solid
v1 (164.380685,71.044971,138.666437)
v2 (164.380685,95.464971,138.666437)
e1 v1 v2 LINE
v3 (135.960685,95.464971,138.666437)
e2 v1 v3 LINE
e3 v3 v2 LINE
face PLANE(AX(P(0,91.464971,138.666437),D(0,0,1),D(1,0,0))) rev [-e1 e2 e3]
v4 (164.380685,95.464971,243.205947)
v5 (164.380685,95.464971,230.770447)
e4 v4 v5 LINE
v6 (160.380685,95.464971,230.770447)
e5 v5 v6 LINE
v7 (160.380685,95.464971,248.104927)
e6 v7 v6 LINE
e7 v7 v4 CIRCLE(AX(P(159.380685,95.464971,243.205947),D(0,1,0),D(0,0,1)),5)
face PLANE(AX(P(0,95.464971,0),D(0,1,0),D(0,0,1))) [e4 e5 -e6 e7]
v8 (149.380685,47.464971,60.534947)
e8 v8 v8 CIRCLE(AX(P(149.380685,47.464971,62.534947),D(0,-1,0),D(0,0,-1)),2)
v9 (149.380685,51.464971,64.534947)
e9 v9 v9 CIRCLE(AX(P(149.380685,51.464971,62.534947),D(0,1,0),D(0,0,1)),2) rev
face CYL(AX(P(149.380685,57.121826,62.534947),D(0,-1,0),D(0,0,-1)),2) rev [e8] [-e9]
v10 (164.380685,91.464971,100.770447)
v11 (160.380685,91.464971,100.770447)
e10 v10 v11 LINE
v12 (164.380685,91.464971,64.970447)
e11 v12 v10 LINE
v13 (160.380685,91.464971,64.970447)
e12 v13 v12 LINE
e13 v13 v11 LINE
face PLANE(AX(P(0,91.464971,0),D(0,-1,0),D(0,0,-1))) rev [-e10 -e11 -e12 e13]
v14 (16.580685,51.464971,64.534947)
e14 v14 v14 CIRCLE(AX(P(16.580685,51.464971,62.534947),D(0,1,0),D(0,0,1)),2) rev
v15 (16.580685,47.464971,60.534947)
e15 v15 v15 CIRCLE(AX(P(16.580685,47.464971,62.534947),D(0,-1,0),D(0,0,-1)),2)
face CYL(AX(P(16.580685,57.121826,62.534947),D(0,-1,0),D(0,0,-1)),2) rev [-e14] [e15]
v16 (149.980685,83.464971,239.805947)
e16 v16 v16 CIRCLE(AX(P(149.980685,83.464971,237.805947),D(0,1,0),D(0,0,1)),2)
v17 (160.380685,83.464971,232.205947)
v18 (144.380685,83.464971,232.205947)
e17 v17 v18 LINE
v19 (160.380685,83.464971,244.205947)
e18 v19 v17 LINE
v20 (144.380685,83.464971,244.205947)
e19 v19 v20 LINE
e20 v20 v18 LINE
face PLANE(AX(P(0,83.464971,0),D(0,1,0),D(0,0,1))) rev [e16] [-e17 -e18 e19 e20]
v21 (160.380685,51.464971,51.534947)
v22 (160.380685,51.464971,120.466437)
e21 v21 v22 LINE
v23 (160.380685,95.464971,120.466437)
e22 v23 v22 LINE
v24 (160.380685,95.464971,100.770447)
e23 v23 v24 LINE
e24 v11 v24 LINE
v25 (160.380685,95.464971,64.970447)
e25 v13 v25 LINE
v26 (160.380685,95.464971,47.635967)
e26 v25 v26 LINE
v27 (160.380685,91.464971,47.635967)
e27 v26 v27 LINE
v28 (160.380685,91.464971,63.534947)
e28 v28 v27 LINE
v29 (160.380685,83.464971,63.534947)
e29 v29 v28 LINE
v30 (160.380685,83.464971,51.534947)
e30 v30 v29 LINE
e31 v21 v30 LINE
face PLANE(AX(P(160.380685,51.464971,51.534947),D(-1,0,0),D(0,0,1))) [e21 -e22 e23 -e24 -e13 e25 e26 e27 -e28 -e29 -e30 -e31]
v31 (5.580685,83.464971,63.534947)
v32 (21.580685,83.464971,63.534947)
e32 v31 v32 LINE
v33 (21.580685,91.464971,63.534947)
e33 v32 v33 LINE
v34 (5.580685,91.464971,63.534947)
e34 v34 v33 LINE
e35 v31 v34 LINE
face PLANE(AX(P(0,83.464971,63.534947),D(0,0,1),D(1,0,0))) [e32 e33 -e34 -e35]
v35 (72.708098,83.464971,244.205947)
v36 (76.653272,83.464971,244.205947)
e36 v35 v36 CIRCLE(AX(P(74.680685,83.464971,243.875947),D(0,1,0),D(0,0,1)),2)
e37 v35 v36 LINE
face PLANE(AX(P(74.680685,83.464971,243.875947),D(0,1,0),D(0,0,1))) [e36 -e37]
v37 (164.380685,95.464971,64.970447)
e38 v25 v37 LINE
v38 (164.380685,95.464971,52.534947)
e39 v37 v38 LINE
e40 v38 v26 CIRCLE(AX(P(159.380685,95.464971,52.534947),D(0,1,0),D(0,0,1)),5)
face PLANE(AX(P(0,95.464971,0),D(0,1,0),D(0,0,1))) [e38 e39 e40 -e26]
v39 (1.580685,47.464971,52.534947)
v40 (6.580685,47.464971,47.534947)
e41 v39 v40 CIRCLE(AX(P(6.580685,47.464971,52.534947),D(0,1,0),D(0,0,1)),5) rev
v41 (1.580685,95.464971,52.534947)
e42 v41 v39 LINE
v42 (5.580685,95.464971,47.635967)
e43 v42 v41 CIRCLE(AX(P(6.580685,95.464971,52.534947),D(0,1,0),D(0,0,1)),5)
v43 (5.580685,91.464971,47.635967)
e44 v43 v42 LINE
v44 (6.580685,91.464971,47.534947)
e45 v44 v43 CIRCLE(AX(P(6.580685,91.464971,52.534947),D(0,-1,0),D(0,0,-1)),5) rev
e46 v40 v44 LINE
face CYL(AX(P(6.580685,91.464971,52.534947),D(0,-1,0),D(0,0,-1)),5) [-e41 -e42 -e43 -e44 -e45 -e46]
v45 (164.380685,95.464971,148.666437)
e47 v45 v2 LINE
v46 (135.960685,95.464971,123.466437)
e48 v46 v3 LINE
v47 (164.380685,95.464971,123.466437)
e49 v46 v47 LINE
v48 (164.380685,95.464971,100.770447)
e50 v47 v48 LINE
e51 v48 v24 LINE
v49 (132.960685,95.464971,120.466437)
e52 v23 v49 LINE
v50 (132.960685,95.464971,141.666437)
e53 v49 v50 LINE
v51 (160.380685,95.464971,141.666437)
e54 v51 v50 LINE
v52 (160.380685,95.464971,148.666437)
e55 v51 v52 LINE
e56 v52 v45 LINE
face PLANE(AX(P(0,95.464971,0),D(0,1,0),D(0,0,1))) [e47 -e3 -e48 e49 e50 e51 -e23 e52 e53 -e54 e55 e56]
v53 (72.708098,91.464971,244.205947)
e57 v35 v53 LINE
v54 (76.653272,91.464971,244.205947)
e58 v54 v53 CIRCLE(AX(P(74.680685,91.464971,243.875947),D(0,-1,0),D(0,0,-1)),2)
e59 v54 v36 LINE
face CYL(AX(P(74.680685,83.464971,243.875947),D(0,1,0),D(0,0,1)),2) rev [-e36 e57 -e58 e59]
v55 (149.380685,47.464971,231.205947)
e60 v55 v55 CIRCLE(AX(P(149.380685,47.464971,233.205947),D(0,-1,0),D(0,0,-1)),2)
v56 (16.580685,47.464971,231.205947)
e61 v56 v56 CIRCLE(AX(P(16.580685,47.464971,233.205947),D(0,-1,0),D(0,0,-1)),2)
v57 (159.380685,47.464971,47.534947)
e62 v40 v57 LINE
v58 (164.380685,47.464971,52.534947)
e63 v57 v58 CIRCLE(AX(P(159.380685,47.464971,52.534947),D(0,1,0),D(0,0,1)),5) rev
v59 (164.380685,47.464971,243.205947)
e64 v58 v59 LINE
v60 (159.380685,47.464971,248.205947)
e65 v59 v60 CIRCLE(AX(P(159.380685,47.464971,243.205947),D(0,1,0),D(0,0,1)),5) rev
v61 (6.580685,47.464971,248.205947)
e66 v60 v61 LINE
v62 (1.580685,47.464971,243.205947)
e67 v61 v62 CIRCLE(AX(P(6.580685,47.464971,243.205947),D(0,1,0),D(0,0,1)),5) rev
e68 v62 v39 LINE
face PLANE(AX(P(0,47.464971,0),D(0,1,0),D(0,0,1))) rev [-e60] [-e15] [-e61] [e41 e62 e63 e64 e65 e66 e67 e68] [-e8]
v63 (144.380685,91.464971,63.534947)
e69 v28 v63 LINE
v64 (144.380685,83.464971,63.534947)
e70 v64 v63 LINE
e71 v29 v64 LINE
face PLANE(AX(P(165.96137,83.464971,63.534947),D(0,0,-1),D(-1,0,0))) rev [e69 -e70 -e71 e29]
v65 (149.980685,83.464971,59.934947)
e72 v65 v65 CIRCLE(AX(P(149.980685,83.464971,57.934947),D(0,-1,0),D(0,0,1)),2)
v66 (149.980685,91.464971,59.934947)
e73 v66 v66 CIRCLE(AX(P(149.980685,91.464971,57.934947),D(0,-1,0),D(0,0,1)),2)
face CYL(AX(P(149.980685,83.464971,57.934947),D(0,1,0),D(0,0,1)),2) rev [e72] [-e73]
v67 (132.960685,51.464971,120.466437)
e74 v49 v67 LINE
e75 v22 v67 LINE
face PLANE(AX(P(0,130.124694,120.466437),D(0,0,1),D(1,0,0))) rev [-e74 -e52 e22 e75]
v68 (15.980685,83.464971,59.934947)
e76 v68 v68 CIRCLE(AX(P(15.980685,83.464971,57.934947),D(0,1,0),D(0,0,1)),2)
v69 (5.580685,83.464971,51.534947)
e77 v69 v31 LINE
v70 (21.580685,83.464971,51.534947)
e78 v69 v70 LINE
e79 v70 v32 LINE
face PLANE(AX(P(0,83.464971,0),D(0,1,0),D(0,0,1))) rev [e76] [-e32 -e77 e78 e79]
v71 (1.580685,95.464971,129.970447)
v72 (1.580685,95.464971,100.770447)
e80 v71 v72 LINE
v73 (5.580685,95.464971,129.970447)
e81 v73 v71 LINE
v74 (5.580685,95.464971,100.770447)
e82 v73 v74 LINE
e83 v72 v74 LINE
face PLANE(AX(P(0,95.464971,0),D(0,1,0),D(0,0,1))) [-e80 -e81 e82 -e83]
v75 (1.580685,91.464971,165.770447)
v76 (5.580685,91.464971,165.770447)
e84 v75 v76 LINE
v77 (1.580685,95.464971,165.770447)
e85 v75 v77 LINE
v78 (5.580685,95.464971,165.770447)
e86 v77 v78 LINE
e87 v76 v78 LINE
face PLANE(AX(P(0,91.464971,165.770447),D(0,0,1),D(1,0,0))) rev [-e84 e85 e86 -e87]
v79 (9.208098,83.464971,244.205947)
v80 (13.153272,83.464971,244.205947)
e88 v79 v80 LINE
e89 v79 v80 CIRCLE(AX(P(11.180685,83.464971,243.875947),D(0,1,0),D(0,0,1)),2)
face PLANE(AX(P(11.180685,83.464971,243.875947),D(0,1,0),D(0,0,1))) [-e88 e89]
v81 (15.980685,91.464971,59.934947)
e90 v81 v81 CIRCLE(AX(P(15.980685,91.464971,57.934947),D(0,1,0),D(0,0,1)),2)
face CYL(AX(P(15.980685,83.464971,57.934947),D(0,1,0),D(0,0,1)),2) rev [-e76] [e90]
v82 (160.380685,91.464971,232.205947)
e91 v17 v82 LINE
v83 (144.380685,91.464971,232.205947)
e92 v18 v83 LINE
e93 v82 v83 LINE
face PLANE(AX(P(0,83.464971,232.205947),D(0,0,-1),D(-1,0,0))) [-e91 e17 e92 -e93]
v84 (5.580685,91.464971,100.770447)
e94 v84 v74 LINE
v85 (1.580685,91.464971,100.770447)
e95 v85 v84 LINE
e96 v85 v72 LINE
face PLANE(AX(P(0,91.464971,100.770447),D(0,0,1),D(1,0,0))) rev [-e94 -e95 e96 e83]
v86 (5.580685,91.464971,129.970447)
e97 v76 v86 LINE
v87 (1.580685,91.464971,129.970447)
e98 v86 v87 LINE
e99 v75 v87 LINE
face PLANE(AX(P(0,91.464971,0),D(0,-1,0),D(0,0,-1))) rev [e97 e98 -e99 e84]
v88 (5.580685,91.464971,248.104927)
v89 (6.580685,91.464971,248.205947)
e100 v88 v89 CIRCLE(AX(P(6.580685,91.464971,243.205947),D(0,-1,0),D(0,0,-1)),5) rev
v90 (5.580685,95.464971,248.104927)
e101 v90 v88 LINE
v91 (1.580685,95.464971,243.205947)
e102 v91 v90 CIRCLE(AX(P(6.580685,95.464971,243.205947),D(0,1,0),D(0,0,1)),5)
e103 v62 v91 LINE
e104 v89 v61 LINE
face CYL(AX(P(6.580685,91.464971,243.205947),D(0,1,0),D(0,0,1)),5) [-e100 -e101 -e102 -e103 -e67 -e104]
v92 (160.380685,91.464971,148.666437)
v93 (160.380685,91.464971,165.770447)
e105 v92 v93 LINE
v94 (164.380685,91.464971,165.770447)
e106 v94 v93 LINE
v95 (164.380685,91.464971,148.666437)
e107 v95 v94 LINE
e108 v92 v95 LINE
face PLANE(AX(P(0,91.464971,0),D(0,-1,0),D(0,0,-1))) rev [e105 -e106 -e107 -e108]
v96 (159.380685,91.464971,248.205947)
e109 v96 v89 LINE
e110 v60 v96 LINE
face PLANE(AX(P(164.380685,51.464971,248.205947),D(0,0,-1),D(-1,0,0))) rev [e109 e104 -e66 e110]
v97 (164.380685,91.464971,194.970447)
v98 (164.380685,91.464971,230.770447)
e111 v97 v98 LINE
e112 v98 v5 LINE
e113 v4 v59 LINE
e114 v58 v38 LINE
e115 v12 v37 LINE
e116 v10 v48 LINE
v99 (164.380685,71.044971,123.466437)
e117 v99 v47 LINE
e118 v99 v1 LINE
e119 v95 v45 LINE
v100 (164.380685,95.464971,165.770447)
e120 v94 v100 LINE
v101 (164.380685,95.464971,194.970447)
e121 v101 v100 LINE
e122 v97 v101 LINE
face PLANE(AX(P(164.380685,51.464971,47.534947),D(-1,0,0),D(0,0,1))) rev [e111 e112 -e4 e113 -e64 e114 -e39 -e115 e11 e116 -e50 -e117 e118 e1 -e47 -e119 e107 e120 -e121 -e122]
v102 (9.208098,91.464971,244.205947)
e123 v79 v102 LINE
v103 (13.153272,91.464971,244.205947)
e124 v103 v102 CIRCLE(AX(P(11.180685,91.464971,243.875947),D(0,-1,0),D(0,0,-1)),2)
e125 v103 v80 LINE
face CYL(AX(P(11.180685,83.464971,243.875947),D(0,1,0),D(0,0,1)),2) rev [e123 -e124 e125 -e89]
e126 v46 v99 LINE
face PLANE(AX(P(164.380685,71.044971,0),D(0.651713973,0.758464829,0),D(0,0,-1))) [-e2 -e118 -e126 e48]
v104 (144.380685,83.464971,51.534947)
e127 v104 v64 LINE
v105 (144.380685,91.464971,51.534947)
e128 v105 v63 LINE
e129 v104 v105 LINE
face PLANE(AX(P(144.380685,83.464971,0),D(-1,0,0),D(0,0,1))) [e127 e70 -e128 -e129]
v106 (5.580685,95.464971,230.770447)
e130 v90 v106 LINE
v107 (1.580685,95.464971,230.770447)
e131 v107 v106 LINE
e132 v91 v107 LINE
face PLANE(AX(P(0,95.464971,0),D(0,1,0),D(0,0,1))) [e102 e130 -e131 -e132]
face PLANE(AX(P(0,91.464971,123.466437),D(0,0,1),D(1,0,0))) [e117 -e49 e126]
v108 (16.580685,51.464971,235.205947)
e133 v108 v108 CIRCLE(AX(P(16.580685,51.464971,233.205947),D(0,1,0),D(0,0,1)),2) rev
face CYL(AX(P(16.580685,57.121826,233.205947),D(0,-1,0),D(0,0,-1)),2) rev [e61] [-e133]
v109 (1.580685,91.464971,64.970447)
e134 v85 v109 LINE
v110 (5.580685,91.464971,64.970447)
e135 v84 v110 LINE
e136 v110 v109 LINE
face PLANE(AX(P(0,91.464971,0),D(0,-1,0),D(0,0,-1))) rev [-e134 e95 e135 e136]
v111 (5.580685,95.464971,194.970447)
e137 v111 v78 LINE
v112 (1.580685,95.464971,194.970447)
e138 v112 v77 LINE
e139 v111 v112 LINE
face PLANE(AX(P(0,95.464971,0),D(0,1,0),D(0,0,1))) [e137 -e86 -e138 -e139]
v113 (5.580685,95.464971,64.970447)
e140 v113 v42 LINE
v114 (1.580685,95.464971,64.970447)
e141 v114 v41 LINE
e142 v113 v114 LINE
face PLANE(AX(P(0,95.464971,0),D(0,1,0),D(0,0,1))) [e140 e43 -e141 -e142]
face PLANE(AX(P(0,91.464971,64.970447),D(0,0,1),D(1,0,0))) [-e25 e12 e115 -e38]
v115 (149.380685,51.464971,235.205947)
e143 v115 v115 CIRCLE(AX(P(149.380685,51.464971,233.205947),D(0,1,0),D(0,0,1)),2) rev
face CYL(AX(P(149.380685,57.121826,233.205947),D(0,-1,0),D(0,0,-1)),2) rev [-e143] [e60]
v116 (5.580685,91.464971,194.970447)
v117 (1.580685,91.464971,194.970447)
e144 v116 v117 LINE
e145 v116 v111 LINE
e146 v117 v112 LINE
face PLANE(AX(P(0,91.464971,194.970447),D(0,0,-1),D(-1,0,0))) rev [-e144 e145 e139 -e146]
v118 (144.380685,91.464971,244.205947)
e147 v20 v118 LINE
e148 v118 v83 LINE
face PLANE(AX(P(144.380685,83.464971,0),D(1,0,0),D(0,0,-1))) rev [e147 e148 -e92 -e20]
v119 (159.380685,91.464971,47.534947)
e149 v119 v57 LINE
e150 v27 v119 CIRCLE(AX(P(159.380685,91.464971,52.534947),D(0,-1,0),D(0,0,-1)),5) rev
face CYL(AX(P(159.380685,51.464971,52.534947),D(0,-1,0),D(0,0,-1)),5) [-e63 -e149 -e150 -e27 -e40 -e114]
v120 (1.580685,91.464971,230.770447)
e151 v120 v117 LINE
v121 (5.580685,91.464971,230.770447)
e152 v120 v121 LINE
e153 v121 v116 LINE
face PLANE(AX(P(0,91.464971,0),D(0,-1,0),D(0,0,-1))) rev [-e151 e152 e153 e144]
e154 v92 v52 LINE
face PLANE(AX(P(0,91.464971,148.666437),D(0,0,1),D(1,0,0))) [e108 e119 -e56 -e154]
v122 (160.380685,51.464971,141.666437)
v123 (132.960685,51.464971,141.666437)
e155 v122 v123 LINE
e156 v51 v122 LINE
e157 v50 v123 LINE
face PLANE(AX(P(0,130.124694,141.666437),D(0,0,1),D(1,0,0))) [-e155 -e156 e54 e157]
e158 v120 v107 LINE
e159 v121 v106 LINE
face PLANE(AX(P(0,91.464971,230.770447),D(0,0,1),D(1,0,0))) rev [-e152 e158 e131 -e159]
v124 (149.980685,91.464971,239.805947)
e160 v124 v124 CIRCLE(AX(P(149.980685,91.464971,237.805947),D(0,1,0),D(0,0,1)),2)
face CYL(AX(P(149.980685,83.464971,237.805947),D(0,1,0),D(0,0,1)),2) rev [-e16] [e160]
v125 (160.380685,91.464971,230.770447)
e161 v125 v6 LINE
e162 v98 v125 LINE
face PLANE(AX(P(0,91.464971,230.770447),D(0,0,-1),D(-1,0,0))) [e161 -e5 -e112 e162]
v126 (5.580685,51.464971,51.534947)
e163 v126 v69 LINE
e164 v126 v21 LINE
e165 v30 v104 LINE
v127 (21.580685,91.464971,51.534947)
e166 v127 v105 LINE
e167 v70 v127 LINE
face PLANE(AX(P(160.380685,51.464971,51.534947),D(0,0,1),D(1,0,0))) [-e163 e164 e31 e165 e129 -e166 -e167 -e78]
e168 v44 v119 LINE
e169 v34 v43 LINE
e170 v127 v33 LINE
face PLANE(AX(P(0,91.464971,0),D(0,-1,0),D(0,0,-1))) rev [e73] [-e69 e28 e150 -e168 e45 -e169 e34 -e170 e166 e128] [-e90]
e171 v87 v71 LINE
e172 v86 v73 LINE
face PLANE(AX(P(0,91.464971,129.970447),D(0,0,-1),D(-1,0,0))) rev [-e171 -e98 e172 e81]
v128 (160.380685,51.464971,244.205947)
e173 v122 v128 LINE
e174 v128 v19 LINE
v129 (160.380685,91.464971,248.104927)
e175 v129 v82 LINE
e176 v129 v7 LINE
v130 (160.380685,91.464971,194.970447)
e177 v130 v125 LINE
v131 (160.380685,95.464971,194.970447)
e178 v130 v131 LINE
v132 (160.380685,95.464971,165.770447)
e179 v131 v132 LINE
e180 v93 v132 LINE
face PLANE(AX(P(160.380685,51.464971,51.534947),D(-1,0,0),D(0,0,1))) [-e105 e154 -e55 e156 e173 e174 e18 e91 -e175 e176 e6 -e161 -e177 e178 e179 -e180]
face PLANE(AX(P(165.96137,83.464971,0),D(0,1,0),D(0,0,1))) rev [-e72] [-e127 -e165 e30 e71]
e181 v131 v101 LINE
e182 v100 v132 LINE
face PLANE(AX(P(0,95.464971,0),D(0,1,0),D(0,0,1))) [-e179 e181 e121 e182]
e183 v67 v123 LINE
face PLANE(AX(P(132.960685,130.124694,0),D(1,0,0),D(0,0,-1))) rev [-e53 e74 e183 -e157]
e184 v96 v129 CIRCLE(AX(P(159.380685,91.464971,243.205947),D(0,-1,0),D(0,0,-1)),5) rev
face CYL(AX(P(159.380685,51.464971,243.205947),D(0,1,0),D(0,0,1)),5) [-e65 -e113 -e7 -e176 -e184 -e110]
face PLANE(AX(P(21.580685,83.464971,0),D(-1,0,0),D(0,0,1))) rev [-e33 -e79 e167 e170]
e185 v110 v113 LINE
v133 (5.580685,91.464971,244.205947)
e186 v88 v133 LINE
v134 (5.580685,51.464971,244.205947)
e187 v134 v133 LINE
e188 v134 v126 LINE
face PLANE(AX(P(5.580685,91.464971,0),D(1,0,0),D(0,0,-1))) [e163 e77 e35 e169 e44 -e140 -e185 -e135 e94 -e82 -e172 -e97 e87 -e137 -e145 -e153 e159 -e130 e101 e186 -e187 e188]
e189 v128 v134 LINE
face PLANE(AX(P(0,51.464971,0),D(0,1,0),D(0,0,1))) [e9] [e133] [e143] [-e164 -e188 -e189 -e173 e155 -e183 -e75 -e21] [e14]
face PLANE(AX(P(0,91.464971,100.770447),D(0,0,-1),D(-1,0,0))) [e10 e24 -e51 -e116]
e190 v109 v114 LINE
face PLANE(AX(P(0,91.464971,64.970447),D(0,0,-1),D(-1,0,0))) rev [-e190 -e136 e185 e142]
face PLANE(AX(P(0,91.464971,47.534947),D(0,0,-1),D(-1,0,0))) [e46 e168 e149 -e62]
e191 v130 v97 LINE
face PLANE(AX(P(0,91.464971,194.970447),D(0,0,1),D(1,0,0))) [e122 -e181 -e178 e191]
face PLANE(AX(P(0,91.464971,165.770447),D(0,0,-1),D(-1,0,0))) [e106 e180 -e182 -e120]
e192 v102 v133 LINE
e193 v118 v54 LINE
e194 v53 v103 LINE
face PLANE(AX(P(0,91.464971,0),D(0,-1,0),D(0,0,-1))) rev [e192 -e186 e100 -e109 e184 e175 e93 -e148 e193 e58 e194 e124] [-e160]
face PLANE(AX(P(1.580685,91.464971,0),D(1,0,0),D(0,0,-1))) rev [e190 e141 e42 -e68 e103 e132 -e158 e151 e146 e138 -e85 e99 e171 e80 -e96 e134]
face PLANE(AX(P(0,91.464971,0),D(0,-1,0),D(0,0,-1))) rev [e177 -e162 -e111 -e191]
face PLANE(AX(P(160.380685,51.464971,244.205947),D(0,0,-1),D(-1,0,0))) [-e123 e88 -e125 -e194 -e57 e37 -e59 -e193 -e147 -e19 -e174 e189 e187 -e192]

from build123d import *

# Parameters (mm, degrees)
BOSS_EXTRUDE2_DEPTH   = 4
SKETCH1_W             = 4.0000000000000036
SKETCH1_H             = 29.19999999999999
BOSS_EXTRUDE2_2_DEPTH = 4
BOSS_EXTRUDE2_3_DEPTH = 4
BOSS_EXTRUDE2_4_DEPTH = 4
SKETCH1_W_2           = 4
SKETCH1_H_2           = 17.435500273431558
BOSS_EXTRUDE2_5_DEPTH = 4
BOSS_EXTRUDE2_6_DEPTH = 4
BOSS_EXTRUDE2_7_DEPTH = 4
SKETCH1_H_3           = 17.43550027343155
BOSS_EXTRUDE2_8_DEPTH = 4
CUT_EXTRUDE1_DEPTH    = 4
SKETCH3_W             = 162.8
SKETCH3_H             = 200.6710005468631
BOSS_EXTRUDE3_DEPTH   = 40
SKETCH4_W             = 162.8
SKETCH4_H             = 200.6710005468631
BOSS_EXTRUDE4_DEPTH   = 4
FILLET1_R             = 5
FILLET2_R             = 5
FILLET3_R             = 5
FILLET4_R             = 5
SKETCH5_R             = 1.9999999999999967
SKETCH5_R_2           = 2
SKETCH5_R_3           = 2.0000000000000036
CUT_EXTRUDE2_DEPTH    = 4
BOSS_EXTRUDE5_DEPTH   = 8
SKETCH7_R             = 2.0000000000000036
CUT_EXTRUDE3_DEPTH    = 8
SKETCH8_W             = 16
SKETCH8_H             = 12
BOSS_EXTRUDE6_DEPTH   = 8
SKETCH9_R             = 1.9999999999999967
CUT_EXTRUDE4_DEPTH    = 8
SKETCH11_R            = 2
SKETCH11_R_2          = 1.9999999999999967
CUT_EXTRUDE5_DEPTH    = 8
SKETCH12_W            = 15.199999999999989
SKETCH12_H            = 20.419999999999987
CUT_EXTRUDE6_DEPTH    = 4
BOSS_EXTRUDE7_DEPTH   = 44
SKETCH14_W            = 24.419999999999987
SKETCH14_H            = 15.199999999999989
BOSS_EXTRUDE8_DEPTH   = 19.58
CHAMFER2_SIZE2        = 24.42
CHAMFER2_SIZE         = 28.42


with BuildPart() as part:
    # Sketch1 → Boss-Extrude2 (new body)
    with BuildSketch(Plane(origin=(0, 95.46497129757712, 0), x_dir=(1, 0, 0), z_dir=(0, 1, 0))):
        Polygon((5.580685050864992, -64.97044696543385), (5.580685050864992, -47.5349466920023), (1.580685050864986, -47.5349466920023), (1.5806850508649888, -64.97044696543384), align=None)
    extrude(amount=-BOSS_EXTRUDE2_DEPTH)



with BuildPart() as body_2:
    # Sketch1 → Boss-Extrude2 2 (new body)
    with BuildSketch(Plane(origin=(0, 95.46497129757712, 0), x_dir=(1, 0, 0), z_dir=(0, 1, 0))):
        with Locations((3.5806850508649903, -115.37044696543384)):
            Rectangle(SKETCH1_W, SKETCH1_H)
    extrude(amount=-BOSS_EXTRUDE2_2_DEPTH)


with BuildPart() as body_3:
    # Sketch1 → Boss-Extrude2 3 (new body)
    with BuildSketch(Plane(origin=(0, 95.46497129757712, 0), x_dir=(1, 0, 0), z_dir=(0, 1, 0))):
        Polygon((5.580685050864992, -165.77044696543385), (1.5806850508649957, -165.77044696543385), (1.5806850508649888, -194.97044696543384), (5.580685050864992, -194.97044696543384), align=None)
    extrude(amount=-BOSS_EXTRUDE2_3_DEPTH)


with BuildPart() as body_4:
    # Sketch1 → Boss-Extrude2 4 (new body)
    with BuildSketch(Plane(origin=(0, 95.46497129757712, 0), x_dir=(1, 0, 0), z_dir=(0, 1, 0))):
        Polygon((5.580685050864992, -230.77044696543385), (1.5806850508649888, -230.77044696543385), (1.5806850508649888, -248.2059472388654), (5.580685050864986, -248.2059472388654), align=None)
    extrude(amount=-BOSS_EXTRUDE2_4_DEPTH)


with BuildPart() as body_5:
    # Sketch1 → Boss-Extrude2 5 (new body)
    with BuildSketch(Plane(origin=(0, 95.46497129757712, 0), x_dir=(1, 0, 0), z_dir=(0, 1, 0))):
        with Locations((162.380685050865, -239.48819710214963)):
            Rectangle(SKETCH1_W_2, SKETCH1_H_2)
    extrude(amount=-BOSS_EXTRUDE2_5_DEPTH)


with BuildPart() as body_6:
    # Sketch1 → Boss-Extrude2 6 (new body)
    with BuildSketch(Plane(origin=(0, 95.46497129757712, 0), x_dir=(1, 0, 0), z_dir=(0, 1, 0))):
        with Locations((162.380685050865, -180.37044696543384)):
            Rectangle(SKETCH1_W_2, SKETCH1_H)
    extrude(amount=-BOSS_EXTRUDE2_6_DEPTH)


with BuildPart() as body_7:
    # Sketch1 → Boss-Extrude2 7 (new body)
    with BuildSketch(Plane(origin=(0, 95.46497129757712, 0), x_dir=(1, 0, 0), z_dir=(0, 1, 0))):
        Polygon((164.380685050865, -148.66643660097685), (164.380685050865, -100.77044696543385), (160.380685050865, -100.77044696543385), (160.380685050865, -123.46643660097686), (136.36222349016015, -123.46643660097686), (136.36222349016015, -138.66643660097685), (160.380685050865, -138.66643660097685), (160.380685050865, -148.66643660097685), align=None)
    extrude(amount=-BOSS_EXTRUDE2_7_DEPTH)

    # Sketch2 → Cut-Extrude1 (cut)
    with BuildSketch(Plane(origin=(0, 95.46497129757712, 0), x_dir=(1, 0, 0), z_dir=(0, 1, 0))):
        Polygon((160.380685050865, -123.46643660097686), (136.36222349016015, -123.46643660097686), (136.36222349016015, -138.66643660097685), (160.380685050865, -138.66643660097685), (164.380685050865, -138.66643660097685), (164.380685050865, -123.46643660097686), align=None)
    extrude(amount=-CUT_EXTRUDE1_DEPTH, mode=Mode.SUBTRACT)


with BuildPart() as body_8:
    # Sketch1 → Boss-Extrude2 8 (new body)
    with BuildSketch(Plane(origin=(0, 95.46497129757712, 0), x_dir=(1, 0, 0), z_dir=(0, 1, 0))):
        with Locations((162.380685050865, -56.25269682871807)):
            Rectangle(SKETCH1_W_2, SKETCH1_H_3)
    extrude(amount=-BOSS_EXTRUDE2_8_DEPTH)


with BuildPart() as cut_extrude1_piece_1:
    # of the separate pieces the step leaves, piece 1, a body of its own (cut_extrude1_pieces)
    add(body_7.part.solids().sort_by_distance((164.380685051, 95.464971298, 123.466436601))[0])


with BuildPart() as cut_extrude1_piece_2:
    # of the separate pieces the step leaves, piece 2, a body of its own (cut_extrude1_pieces)
    add(body_7.part.solids().sort_by_distance((164.380685051, 95.464971298, 148.666436601))[0])


with BuildPart() as part_1:
    add(part.part)

    add(body_2.part)  # Boss-Extrude3 merges body 2

    add(body_3.part)  # Boss-Extrude3 merges body 3

    add(body_4.part)  # Boss-Extrude3 merges body 4

    add(body_5.part)  # Boss-Extrude3 merges body 5

    add(body_6.part)  # Boss-Extrude3 merges body 6

    add(body_8.part)  # Boss-Extrude3 merges body 8

    add(cut_extrude1_piece_1.part)  # Boss-Extrude3 merges Cut-Extrude1 piece 1

    add(cut_extrude1_piece_2.part)  # Boss-Extrude3 merges Cut-Extrude1 piece 2
    # Sketch3 → Boss-Extrude3 (add)
    with BuildSketch(Plane.XZ.offset(-91.46497129757712)):
        with Locations((82.98068505086499, 147.87044696543384)):
            Rectangle(SKETCH3_W, SKETCH3_H)
        Polygon((160.380685050865, 51.5349466920023), (160.380685050865, 244.2059472388654), (5.580685050864989, 244.2059472388654), (5.580685050864981, 51.5349466920023), align=None, mode=Mode.SUBTRACT)
    extrude(amount=BOSS_EXTRUDE3_DEPTH)

    # Sketch4 → Boss-Extrude4 (add)
    with BuildSketch(Plane.XZ.offset(-51.46497129757712)):
        with Locations((82.98068505086499, 147.87044696543384)):
            Rectangle(SKETCH4_W, SKETCH4_H)
    extrude(amount=BOSS_EXTRUDE4_DEPTH)

    # Fillet1
    fillet1_edges = [part_1.edges().sort_by_distance(p)[0] for p in [
        (1.5806850508649881, 71.46497129757712, 248.2059472388654),
    ]]
    fillet(fillet1_edges, radius=FILLET1_R)

    # Fillet2
    fillet2_edges = [part_1.edges().sort_by_distance(p)[0] for p in [
        (164.380685050865, 71.46497129757712, 248.2059472388654),
    ]]
    fillet(fillet2_edges, radius=FILLET2_R)

    # Fillet3
    fillet3_edges = [part_1.edges().sort_by_distance(p)[0] for p in [
        (164.380685050865, 71.46497129757712, 47.53494669200231),
    ]]
    fillet(fillet3_edges, radius=FILLET3_R)

    # Fillet4
    fillet4_edges = [part_1.edges().sort_by_distance(p)[0] for p in [
        (1.5806850508649881, 71.46497129757712, 47.53494669200231),
    ]]
    fillet(fillet4_edges, radius=FILLET4_R)

    # Sketch5 → Cut-Extrude2 (cut)
    with BuildSketch(Plane.XZ.offset(-47.46497129757712)):
        with Locations(Location((149.380685050865, 62.53494669200229, 0), (0, 0, 270))):
            Circle(SKETCH5_R)
        with Locations(Location((16.580685050864986, 62.53494669200231, 0), (0, 0, 270))):
            Circle(SKETCH5_R_2)
        with Locations(Location((149.380685050865, 233.20594723886538, 0), (0, 0, 270))):
            Circle(SKETCH5_R)
        with Locations(Location((16.58068505086499, 233.2059472388654, 0), (0, 0, 270))):
            Circle(SKETCH5_R_3)
    extrude(amount=-CUT_EXTRUDE2_DEPTH, mode=Mode.SUBTRACT)

    # Sketch6 → Boss-Extrude5 (add)
    with BuildSketch(Plane(origin=(0, 91.46497129757712, 0), x_dir=(1, 0, 0), z_dir=(0, 1, 0))):
        Polygon((21.580685050864982, -63.534946692002315), (21.580685050864975, -51.5349466920023), (5.580685050864992, -51.5349466920023), (5.580685050864982, -63.53494669200232), align=None)
    boss_extrude5 = extrude(amount=-BOSS_EXTRUDE5_DEPTH)

    # Sketch7 → Cut-Extrude3 (cut)
    with BuildSketch(Plane(origin=(0, 91.46497129757712, 0), x_dir=(1, 0, 0), z_dir=(0, 1, 0))):
        with Locations(Location((15.980685050864993, -57.934946692002306, 0), (0, 0, 270))):
            Circle(SKETCH7_R)
    cut_extrude3 = extrude(amount=-CUT_EXTRUDE3_DEPTH, mode=Mode.SUBTRACT)

    # Mirror1: Boss-Extrude5, Cut-Extrude3 across plane
    add(boss_extrude5.mirror(Plane.ZY.offset(-82.980685050865)))
    add(cut_extrude3.mirror(Plane.ZY.offset(-82.980685050865)), mode=Mode.SUBTRACT)

    # Sketch8 → Boss-Extrude6 (add)
    with BuildSketch(Plane(origin=(0, 91.46497129757712, 0), x_dir=(1, 0, 0), z_dir=(0, 1, 0))):
        with Locations((152.380685050865, -238.2059472388654)):
            Rectangle(SKETCH8_W, SKETCH8_H)
    extrude(amount=-BOSS_EXTRUDE6_DEPTH)

    # Sketch9 → Cut-Extrude4 (cut)
    with BuildSketch(Plane(origin=(0, 91.46497129757712, 0), x_dir=(1, 0, 0), z_dir=(0, 1, 0))):
        with Locations(Location((149.98068505086505, -237.8059472388654, 0), (0, 0, 270))):
            Circle(SKETCH9_R)
    extrude(amount=-CUT_EXTRUDE4_DEPTH, mode=Mode.SUBTRACT)

    # Sketch11 → Cut-Extrude5 (cut)
    with BuildSketch(Plane(origin=(0, 91.46497129757712, 0), x_dir=(1, 0, 0), z_dir=(0, 1, 0))):
        with Locations((11.180685050864989, -243.87594723886542)):
            Circle(SKETCH11_R)
        with Locations((74.680685050865, -243.87594723886542)):
            Circle(SKETCH11_R_2)
    extrude(amount=-CUT_EXTRUDE5_DEPTH, mode=Mode.SUBTRACT)

    # Sketch12 → Cut-Extrude6 (cut)
    with BuildSketch(Plane(origin=(164.380685050865, 0, 0), x_dir=(0, 0, -1), z_dir=(1, 0, 0))):
        with Locations((-131.06643660097686, 81.25497129757713)):
            Rectangle(SKETCH12_W, SKETCH12_H)
    extrude(amount=-CUT_EXTRUDE6_DEPTH, mode=Mode.SUBTRACT)

    # Sketch13 → Boss-Extrude7 (add)
    with BuildSketch(Plane(origin=(0, 51.46497129757712, 0), x_dir=(1, 0, 0), z_dir=(0, 1, 0))):
        Polygon((135.960685050865, -123.46643660097686), (160.380685050865, -123.46643660097686), (160.380685050865, -120.46643660097686), (132.960685050865, -120.46643660097686), (132.960685050865, -141.66643660097685), (160.380685050865, -141.66643660097685), (160.380685050865, -138.66643660097685), (135.960685050865, -138.66643660097685), align=None)
    extrude(amount=BOSS_EXTRUDE7_DEPTH)

    # Sketch14 → Boss-Extrude8 (add)
    with BuildSketch(Plane(origin=(0, 51.46497129757712, 0), x_dir=(1, 0, 0), z_dir=(0, 1, 0))):
        with Locations((148.17068505086502, -131.06643660097686)):
            Rectangle(SKETCH14_W, SKETCH14_H)
    extrude(amount=BOSS_EXTRUDE8_DEPTH)

    # Chamfer2
    chamfer2_edges = [part_1.edges().sort_by_distance(p)[0] for p in [
        (135.960685050865, 71.04497129757712, 131.06643660097686),
    ]]
    chamfer2_side = [part_1.faces().sort_by_distance(p)[0] for p in [
        (136.44908505086502, 71.04497129757712, 131.06643660097686),
    ]]
    chamfer(chamfer2_edges, length=CHAMFER2_SIZE - 0.0001, length2=CHAMFER2_SIZE2 - 0.0001, reference=chamfer2_side[0])  # a hair under: the kernel refuses the full size


solid = part_1.part
